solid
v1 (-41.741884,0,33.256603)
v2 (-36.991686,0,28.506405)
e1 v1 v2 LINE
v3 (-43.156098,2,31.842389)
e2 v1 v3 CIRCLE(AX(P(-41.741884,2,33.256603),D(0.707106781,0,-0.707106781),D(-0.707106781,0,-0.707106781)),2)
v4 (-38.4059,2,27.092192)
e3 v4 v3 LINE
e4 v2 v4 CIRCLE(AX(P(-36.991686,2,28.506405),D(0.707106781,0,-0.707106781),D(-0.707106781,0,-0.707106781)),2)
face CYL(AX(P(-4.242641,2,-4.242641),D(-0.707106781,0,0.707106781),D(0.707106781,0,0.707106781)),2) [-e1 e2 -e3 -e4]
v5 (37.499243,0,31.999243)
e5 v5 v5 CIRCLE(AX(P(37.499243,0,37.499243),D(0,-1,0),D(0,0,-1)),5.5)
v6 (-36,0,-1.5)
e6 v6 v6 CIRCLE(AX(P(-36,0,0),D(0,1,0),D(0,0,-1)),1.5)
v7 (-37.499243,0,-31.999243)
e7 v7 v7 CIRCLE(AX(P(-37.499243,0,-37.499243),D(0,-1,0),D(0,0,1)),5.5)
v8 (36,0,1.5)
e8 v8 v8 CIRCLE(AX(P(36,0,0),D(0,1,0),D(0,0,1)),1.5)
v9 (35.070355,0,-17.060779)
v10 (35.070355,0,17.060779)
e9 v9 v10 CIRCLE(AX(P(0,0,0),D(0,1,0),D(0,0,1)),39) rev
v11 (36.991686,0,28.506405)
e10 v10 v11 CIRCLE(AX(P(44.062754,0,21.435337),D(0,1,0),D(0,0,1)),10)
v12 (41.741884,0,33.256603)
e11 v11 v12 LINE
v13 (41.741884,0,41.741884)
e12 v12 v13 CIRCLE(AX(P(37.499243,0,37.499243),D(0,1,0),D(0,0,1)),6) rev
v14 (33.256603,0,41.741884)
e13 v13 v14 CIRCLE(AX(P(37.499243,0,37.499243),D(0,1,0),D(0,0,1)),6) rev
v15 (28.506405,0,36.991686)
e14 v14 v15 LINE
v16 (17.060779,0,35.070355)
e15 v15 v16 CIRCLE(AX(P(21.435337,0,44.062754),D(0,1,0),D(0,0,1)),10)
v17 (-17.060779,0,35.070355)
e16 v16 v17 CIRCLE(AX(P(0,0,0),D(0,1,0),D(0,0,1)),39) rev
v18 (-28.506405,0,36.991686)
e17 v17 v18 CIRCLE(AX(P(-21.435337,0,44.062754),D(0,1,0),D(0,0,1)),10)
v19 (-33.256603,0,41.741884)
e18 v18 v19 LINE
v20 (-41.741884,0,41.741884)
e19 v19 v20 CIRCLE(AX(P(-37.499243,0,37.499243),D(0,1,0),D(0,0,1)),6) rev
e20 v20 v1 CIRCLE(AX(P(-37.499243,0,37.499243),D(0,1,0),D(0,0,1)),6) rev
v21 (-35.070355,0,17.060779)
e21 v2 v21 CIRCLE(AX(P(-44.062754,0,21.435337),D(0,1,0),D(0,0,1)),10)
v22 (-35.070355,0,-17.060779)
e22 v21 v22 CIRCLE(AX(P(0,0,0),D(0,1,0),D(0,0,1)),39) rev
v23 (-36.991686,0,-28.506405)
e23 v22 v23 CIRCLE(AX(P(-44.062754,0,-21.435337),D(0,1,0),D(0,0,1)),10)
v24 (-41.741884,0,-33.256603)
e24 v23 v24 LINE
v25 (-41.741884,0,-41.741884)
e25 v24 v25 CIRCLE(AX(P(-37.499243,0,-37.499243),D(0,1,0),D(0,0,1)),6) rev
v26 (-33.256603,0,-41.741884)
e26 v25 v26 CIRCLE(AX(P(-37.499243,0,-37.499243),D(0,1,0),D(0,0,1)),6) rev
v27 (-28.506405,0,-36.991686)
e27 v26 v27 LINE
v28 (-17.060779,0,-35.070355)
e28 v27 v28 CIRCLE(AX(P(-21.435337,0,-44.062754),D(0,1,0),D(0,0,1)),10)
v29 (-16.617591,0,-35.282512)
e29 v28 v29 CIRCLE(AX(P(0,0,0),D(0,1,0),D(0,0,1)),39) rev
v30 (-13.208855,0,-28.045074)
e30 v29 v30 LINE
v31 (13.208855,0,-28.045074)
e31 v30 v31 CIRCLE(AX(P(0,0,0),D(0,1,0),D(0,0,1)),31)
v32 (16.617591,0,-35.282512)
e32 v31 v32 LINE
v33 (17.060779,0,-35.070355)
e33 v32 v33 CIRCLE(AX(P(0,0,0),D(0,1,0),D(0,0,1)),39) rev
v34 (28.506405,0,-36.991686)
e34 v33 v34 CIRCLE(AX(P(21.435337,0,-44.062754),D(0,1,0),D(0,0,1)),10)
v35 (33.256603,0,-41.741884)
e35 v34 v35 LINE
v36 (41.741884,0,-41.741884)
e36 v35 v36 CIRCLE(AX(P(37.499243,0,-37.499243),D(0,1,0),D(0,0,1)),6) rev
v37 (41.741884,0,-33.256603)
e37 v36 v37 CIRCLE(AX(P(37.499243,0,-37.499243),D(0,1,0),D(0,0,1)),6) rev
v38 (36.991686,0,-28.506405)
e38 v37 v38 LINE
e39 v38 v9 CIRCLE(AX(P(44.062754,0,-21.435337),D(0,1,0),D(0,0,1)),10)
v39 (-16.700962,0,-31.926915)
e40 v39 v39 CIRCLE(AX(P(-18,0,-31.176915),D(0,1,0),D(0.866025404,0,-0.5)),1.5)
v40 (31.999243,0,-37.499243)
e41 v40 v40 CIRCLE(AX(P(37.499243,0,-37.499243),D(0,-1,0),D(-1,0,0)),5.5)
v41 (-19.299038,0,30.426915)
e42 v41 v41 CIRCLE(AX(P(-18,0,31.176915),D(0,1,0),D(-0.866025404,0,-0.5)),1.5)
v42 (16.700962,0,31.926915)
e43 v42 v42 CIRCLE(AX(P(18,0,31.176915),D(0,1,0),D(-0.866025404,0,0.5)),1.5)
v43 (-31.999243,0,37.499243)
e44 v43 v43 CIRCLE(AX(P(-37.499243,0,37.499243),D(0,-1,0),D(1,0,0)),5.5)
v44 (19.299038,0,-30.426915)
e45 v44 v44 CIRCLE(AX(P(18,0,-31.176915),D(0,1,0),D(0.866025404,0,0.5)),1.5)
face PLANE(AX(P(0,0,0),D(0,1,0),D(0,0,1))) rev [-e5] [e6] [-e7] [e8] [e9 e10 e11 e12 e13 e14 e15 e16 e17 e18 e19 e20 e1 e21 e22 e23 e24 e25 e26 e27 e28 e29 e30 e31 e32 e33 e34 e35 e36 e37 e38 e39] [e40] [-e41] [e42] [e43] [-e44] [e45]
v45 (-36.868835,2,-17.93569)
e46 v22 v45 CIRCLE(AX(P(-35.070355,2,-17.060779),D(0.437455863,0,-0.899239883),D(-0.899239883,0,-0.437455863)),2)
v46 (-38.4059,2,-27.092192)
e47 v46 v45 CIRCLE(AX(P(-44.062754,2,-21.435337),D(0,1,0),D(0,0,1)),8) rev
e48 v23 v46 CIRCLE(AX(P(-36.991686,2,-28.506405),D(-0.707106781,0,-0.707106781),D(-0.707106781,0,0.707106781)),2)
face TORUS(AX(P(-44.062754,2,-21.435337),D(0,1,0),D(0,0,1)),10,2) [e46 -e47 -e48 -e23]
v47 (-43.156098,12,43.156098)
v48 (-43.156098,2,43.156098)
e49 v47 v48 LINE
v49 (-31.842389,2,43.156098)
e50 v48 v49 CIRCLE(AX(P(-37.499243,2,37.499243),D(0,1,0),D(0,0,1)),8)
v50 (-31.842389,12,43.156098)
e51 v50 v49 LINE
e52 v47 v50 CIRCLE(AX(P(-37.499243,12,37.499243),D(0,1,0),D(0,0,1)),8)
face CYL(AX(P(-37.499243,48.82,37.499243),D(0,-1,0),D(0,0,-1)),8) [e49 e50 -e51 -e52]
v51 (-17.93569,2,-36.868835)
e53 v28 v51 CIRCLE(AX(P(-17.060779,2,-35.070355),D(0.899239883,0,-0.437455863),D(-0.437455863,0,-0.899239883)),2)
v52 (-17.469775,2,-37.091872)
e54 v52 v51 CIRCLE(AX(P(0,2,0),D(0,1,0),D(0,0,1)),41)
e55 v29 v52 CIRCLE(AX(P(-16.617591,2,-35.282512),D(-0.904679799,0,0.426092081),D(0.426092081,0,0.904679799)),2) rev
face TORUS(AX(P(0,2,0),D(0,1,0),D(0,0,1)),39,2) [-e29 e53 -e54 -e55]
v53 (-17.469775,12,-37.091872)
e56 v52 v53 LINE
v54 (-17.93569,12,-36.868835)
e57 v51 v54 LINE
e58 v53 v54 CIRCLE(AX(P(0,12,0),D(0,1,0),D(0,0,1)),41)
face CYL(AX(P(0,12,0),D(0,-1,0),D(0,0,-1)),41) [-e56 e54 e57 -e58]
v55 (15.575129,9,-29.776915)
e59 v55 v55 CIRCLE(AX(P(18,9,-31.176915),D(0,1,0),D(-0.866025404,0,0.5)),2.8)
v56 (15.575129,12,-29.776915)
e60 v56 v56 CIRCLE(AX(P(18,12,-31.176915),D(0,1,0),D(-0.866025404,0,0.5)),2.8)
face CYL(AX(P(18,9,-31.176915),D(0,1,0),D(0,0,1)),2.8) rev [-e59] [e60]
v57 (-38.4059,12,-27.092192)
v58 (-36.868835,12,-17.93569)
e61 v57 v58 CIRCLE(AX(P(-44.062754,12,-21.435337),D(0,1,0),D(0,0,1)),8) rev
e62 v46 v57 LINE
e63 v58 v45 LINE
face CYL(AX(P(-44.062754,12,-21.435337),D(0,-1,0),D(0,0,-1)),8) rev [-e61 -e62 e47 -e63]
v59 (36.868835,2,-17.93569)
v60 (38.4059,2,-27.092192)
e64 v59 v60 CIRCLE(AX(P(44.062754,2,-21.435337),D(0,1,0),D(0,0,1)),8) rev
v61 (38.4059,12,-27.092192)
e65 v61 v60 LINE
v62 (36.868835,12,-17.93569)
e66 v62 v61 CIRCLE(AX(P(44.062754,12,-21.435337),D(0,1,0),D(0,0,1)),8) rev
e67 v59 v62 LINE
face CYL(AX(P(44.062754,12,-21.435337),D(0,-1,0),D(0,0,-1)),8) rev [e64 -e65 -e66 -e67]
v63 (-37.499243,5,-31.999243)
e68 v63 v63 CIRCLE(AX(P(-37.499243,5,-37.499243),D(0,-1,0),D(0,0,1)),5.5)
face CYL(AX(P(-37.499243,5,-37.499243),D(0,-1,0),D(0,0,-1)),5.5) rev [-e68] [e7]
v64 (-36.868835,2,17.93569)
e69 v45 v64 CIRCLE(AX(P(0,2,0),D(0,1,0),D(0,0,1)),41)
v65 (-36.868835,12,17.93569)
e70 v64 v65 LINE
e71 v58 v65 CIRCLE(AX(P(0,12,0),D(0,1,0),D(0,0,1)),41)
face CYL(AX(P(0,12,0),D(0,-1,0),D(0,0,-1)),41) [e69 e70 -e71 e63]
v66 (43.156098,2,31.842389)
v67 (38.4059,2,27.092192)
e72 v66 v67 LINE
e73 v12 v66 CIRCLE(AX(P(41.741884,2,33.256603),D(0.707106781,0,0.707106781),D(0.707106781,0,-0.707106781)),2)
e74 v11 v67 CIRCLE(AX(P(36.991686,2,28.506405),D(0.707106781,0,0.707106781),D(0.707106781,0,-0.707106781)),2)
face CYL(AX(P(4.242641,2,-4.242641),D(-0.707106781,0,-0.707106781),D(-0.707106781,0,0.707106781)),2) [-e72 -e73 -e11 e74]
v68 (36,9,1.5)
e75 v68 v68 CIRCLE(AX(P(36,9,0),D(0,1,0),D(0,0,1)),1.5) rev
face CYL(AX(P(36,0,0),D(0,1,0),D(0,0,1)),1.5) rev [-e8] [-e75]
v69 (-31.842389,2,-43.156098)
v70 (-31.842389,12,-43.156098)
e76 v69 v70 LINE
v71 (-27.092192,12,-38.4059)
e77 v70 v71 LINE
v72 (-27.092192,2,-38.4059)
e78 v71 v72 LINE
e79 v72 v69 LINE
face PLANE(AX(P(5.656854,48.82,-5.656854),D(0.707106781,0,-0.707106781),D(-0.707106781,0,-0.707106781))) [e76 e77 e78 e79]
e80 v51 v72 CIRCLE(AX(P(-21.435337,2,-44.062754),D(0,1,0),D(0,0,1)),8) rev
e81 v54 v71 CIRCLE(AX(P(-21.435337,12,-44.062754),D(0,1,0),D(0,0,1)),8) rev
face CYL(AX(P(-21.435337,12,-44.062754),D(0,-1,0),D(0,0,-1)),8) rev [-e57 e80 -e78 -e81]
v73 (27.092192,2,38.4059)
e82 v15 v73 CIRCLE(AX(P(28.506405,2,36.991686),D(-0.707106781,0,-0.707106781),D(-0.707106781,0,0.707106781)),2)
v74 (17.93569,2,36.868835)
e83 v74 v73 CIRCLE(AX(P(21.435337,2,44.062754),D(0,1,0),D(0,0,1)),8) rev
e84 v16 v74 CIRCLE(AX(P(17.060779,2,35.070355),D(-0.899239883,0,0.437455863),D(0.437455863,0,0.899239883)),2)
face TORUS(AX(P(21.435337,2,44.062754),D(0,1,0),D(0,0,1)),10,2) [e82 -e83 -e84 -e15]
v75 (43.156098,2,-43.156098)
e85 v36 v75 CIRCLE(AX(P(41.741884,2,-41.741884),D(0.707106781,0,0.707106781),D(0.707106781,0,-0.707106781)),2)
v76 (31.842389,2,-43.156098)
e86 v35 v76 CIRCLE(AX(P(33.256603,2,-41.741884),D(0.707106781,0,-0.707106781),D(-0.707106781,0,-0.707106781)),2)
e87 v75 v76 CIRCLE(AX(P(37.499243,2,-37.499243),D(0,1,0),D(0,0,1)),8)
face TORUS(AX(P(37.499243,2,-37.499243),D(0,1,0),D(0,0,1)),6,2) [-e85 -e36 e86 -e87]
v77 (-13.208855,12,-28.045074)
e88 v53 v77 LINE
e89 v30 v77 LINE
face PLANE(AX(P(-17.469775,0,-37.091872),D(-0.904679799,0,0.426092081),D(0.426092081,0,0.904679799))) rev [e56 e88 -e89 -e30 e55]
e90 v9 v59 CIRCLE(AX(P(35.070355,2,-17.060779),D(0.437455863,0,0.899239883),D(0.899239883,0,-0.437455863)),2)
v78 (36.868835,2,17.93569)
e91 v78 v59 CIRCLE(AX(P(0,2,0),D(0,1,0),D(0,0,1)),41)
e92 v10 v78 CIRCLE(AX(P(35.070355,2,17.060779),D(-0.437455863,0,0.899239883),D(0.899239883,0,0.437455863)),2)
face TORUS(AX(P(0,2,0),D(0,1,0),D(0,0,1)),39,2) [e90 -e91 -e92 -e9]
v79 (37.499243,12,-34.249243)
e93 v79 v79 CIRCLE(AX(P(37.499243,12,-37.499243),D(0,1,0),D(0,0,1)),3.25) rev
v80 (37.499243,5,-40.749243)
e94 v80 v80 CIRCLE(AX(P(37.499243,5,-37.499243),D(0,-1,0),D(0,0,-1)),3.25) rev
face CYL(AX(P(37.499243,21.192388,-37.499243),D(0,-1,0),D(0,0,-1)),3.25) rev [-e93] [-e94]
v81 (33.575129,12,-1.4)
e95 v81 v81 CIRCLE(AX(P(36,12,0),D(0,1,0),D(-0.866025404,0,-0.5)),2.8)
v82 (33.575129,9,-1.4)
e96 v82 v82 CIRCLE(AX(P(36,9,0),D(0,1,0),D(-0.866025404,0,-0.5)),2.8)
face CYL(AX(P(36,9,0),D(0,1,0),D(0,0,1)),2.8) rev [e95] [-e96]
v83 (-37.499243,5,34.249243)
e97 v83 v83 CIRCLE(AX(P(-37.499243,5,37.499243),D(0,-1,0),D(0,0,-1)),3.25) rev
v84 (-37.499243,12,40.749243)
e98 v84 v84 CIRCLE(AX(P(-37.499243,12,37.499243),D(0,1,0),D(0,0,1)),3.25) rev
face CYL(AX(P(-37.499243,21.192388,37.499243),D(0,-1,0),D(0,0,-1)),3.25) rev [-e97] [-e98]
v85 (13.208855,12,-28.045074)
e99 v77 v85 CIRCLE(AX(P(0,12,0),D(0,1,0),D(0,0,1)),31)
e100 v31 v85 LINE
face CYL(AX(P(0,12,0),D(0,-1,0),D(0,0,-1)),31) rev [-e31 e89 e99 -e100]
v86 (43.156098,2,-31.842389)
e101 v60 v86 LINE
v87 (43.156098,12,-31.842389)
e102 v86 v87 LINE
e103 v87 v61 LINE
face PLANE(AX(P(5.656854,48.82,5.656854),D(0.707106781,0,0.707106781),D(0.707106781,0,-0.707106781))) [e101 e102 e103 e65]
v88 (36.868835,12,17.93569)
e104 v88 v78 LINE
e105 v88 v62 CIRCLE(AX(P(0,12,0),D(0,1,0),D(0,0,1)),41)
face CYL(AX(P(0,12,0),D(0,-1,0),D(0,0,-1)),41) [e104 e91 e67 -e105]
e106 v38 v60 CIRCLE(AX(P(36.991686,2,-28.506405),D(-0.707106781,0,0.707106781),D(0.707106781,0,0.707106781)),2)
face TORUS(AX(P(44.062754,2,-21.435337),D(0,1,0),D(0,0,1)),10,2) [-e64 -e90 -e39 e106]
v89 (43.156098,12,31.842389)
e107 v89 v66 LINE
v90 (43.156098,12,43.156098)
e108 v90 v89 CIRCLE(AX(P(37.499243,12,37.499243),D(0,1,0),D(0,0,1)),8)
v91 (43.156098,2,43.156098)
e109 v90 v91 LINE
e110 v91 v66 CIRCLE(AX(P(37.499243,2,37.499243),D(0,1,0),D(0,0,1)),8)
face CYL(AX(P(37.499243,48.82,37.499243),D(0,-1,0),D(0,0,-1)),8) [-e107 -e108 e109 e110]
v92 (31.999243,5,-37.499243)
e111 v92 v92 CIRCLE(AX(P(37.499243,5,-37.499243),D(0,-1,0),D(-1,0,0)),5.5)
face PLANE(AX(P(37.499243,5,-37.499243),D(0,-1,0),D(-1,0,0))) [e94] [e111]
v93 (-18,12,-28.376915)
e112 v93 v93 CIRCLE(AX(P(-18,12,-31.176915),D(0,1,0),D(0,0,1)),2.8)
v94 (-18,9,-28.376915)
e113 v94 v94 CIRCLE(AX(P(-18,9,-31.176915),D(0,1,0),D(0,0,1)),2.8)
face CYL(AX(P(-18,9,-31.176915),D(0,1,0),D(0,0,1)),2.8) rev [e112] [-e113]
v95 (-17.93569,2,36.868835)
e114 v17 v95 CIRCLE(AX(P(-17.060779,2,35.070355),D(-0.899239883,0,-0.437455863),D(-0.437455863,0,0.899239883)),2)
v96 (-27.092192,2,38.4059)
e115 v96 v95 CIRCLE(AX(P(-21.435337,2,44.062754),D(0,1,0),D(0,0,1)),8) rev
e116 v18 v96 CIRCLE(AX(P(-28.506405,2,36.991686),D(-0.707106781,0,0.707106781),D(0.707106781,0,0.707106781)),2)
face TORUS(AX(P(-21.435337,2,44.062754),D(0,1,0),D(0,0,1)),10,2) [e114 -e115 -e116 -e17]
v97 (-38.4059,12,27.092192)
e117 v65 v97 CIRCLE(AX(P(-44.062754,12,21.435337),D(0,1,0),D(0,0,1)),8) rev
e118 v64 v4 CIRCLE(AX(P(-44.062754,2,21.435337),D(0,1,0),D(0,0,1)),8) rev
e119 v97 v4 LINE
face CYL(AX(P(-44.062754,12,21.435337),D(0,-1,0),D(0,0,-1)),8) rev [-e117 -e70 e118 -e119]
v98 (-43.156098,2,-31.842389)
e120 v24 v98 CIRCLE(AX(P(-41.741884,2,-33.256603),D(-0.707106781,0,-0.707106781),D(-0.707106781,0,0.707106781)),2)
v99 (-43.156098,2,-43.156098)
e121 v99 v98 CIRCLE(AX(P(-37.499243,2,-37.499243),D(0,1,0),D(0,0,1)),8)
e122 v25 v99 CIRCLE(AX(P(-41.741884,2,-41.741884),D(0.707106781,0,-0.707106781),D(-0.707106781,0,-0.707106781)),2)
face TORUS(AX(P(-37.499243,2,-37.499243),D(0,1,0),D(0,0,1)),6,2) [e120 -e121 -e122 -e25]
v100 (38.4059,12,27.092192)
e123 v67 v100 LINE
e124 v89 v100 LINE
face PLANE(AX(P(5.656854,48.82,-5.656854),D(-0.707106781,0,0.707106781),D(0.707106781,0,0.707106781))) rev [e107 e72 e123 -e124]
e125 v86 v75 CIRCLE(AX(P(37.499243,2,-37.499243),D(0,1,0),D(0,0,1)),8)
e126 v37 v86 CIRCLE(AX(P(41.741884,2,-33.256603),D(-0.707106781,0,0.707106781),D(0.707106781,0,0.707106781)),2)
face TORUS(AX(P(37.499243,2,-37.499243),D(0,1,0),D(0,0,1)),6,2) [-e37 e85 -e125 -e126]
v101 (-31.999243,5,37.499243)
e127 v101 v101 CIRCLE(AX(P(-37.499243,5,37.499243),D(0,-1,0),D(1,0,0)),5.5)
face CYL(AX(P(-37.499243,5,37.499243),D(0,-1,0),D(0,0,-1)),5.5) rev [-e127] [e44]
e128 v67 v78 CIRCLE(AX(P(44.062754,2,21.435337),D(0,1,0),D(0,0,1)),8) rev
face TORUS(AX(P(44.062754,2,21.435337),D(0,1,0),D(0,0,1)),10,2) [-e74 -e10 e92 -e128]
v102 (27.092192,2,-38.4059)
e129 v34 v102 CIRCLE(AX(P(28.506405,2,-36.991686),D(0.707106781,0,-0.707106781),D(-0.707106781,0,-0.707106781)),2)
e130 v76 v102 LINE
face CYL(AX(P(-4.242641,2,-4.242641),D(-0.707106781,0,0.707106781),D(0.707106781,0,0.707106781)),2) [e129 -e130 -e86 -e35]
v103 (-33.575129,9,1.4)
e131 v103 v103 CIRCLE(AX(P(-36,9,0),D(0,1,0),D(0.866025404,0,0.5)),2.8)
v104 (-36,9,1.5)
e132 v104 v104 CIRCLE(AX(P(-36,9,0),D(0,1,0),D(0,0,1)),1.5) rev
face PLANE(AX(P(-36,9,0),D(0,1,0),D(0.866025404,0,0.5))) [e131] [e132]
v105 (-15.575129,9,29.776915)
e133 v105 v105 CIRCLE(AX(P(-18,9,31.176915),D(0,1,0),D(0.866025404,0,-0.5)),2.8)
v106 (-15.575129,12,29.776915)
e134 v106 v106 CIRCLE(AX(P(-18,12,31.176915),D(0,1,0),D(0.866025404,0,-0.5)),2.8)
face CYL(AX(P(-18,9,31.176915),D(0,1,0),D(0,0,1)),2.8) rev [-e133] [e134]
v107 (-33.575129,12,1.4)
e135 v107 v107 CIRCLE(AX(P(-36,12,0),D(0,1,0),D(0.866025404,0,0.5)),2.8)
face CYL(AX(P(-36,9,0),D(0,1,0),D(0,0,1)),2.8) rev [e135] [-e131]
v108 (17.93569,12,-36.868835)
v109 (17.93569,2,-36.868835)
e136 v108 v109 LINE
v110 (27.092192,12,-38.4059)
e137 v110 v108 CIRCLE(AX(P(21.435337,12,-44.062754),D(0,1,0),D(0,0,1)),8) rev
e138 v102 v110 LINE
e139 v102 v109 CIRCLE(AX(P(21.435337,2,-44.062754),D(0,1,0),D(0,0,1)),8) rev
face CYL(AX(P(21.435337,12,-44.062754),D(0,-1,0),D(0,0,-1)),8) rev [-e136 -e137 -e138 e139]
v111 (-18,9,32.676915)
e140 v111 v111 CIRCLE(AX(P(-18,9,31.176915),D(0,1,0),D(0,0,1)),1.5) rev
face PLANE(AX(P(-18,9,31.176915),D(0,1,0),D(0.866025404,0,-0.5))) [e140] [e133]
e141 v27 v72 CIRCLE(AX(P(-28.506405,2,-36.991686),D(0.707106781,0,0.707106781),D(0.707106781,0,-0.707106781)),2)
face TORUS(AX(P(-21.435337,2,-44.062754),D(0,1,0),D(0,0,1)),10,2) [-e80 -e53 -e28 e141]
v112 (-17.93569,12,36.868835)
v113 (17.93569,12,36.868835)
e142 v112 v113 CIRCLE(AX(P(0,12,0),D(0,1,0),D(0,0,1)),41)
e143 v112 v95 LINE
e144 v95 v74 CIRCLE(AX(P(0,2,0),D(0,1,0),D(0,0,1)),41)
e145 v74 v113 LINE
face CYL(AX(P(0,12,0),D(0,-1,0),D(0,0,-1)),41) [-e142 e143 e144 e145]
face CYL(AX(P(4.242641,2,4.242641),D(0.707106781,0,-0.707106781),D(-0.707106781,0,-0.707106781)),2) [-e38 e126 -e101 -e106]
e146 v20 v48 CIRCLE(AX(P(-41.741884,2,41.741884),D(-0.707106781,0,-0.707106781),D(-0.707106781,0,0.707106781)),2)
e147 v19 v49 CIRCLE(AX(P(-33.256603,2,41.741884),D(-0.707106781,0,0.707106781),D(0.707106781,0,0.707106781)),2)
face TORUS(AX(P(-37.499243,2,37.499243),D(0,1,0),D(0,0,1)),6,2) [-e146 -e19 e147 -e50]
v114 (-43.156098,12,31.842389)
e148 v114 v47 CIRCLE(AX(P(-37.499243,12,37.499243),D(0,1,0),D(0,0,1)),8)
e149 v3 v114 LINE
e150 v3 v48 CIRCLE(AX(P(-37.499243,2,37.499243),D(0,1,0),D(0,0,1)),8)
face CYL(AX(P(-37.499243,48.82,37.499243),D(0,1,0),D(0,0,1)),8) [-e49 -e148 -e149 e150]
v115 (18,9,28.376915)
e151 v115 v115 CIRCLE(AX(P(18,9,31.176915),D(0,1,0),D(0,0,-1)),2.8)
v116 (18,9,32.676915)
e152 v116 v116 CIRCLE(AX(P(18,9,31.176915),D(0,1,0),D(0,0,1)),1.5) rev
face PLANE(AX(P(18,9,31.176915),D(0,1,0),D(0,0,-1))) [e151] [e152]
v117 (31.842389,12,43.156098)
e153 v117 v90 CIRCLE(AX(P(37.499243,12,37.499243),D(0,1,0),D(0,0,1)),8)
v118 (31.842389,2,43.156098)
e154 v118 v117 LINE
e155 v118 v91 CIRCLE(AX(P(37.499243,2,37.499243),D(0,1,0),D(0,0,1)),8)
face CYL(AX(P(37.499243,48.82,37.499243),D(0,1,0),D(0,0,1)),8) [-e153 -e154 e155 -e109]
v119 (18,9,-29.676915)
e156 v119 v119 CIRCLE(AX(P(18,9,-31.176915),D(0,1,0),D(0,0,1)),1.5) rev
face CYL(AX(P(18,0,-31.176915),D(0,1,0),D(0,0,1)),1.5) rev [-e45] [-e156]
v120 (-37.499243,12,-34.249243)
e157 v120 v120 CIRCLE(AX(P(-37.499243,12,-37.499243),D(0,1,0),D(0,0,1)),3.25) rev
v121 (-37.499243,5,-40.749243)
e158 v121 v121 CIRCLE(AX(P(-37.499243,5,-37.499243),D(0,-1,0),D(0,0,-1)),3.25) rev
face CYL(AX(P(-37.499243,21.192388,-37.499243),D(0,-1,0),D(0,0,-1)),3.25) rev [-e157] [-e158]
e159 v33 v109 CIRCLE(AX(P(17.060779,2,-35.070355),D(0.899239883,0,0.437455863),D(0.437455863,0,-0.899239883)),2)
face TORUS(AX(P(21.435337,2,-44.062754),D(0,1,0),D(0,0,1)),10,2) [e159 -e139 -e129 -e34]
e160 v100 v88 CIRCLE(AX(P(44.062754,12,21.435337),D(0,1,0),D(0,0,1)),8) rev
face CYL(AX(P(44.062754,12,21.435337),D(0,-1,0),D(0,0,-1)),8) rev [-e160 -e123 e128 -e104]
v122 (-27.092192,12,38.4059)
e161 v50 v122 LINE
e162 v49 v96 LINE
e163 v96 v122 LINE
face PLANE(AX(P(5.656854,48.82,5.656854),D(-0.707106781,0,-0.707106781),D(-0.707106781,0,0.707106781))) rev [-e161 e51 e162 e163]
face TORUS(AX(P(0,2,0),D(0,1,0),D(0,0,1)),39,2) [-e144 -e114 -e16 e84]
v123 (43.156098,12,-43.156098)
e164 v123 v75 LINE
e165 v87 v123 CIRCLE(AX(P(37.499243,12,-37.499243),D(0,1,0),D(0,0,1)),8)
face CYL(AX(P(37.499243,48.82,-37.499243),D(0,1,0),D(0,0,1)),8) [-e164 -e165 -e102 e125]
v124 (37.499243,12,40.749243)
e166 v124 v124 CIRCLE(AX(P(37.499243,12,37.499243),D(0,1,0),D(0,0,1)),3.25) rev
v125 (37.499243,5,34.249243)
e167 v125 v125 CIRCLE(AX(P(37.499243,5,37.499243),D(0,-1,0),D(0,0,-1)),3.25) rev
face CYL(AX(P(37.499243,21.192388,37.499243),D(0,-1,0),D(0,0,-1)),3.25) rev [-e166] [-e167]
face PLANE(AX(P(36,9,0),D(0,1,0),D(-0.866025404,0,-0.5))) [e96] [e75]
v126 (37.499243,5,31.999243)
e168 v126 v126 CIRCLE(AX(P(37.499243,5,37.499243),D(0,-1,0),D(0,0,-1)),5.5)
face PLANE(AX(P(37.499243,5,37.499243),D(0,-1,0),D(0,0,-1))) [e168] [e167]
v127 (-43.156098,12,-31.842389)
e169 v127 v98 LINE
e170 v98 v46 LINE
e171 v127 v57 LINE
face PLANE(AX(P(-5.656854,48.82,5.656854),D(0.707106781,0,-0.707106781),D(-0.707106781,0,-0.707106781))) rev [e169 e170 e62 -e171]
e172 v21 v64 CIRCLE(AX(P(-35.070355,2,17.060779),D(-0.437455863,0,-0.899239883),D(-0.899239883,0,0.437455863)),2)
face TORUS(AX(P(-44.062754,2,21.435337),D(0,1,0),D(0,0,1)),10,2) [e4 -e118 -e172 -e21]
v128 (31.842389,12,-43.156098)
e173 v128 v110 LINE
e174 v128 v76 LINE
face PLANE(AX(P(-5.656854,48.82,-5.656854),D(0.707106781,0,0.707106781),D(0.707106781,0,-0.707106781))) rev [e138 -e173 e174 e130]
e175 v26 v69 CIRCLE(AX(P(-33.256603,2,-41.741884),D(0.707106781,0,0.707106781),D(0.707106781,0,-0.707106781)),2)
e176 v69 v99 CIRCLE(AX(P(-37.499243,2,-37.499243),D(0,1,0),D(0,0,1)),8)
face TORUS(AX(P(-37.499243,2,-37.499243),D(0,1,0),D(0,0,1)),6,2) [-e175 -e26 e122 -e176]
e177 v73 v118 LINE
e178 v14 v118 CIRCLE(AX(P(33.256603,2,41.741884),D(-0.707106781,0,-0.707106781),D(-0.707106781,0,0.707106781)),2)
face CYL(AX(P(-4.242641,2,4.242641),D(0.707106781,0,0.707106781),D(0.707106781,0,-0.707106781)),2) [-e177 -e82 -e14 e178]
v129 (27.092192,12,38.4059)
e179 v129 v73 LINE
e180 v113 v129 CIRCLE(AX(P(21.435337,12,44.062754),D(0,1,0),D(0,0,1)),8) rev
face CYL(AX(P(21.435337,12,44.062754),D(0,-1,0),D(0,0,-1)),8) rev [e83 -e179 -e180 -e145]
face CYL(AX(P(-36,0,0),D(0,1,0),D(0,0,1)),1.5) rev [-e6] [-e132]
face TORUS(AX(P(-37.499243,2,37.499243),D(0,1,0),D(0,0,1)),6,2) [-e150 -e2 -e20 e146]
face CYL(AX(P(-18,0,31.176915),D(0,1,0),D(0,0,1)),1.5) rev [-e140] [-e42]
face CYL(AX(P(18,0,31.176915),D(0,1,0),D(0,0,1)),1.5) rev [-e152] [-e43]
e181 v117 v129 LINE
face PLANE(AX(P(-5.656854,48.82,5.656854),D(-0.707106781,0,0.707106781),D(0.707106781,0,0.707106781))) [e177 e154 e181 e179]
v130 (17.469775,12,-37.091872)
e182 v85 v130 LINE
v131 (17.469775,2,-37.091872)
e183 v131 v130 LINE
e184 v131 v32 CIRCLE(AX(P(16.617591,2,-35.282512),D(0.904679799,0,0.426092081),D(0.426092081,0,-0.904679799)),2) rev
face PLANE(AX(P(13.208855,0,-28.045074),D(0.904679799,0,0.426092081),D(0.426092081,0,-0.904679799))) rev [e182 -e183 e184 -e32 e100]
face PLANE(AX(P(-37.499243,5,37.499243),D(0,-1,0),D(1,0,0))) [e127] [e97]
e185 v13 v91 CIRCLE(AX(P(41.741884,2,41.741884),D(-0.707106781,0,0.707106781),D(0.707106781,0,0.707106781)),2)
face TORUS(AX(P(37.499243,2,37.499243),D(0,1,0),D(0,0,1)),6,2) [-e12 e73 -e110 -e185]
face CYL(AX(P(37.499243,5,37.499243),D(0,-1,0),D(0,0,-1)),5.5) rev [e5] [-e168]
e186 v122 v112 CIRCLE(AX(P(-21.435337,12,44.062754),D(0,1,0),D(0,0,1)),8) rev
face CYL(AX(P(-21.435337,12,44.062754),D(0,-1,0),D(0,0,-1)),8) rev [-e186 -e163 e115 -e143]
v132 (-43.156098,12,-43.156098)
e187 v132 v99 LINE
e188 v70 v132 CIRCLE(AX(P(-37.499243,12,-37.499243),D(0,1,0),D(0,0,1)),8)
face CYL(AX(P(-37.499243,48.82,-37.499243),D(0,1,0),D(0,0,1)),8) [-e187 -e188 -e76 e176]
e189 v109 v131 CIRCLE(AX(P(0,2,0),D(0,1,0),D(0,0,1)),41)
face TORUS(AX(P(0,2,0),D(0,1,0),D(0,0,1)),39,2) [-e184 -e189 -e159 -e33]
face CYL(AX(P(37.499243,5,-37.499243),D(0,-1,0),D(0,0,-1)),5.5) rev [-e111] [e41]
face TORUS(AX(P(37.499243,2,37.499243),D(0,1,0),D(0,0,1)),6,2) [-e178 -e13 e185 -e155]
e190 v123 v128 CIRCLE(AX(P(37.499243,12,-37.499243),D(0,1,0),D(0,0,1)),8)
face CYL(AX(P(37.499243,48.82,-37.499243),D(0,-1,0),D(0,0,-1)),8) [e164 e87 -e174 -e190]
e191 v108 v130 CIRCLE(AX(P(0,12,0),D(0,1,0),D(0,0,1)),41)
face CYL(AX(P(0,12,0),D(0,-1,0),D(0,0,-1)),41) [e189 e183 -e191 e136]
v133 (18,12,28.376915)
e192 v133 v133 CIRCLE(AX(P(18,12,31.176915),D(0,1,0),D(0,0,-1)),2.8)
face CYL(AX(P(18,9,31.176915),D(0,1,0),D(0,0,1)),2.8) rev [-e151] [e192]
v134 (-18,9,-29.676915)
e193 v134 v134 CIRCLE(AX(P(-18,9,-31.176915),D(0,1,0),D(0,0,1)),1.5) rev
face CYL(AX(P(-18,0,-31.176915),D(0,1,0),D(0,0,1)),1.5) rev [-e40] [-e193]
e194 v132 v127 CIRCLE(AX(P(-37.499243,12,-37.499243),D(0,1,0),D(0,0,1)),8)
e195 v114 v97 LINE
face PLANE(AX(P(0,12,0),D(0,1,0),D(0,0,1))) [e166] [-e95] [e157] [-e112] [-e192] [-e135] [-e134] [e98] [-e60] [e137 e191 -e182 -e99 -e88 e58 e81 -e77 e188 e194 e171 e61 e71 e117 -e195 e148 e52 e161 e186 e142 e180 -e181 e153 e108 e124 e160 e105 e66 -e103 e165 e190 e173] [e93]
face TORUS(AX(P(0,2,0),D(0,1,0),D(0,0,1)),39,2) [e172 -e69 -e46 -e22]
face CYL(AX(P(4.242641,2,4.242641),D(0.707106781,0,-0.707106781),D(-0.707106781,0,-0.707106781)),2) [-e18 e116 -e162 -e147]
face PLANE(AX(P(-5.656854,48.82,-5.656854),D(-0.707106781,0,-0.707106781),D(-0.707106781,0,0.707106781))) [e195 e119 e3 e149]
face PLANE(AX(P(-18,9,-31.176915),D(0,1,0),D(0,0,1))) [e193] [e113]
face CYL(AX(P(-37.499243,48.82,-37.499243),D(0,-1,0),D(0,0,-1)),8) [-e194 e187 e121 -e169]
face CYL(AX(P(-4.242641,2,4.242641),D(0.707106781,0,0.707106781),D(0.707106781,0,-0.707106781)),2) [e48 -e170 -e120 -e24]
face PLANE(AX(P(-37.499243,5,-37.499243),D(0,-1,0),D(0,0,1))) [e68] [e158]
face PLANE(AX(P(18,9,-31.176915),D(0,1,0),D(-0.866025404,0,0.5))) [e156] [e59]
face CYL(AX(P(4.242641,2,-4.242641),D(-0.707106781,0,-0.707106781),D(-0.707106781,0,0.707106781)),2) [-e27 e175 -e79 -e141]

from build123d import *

# Parameters (mm, degrees)
SKETCH1_R                = 41
SKETCH1_R_2              = 31
BOSS_EXTRUDE1_DEPTH      = 12
SKETCH2_R                = 1.5
CUT_EXTRUDE1_DEPTH       = 60.211485372
CIRPATTERN1_COUNT        = 6
CUT_EXTRUDE2_DEPTH       = 60.211485372
SKETCH4_R                = 2.8
CUT_EXTRUDE3_DEPTH       = 3
CIRPATTERN2_COUNT        = 6
BOSS_EXTRUDE2_DEPTH      = 12
FILLET1_R                = 8
FILLET2_R                = 8
SKETCH6_R                = 3.25
CUT_EXTRUDE4_DEPTH       = 12
SKETCH7_R                = 5.5
CUT_EXTRUDE5_DEPTH       = 5
CIRPATTERN3_COUNT        = 4
FILLET1_OF_CIRPATTERN3_R = 8
FILLET2_OF_CIRPATTERN3_R = 8
FILLET3_R                = 2


with BuildPart() as part:
    # Sketch1 → Boss-Extrude1 (new body)
    with BuildSketch(Plane(origin=(0, 0, 0), x_dir=(1, 0, 0), z_dir=(0, 1, 0))):
        with Locations(Location((0, 0, 0), (0, 0, 270))):
            Circle(SKETCH1_R)
        with Locations(Location((0, 0, 0), (0, 0, 270))):
            Circle(SKETCH1_R_2, mode=Mode.SUBTRACT)
    extrude(amount=BOSS_EXTRUDE1_DEPTH)

    # Sketch2 → Cut-Extrude1 (cut, through all)
    with BuildSketch(Plane(origin=(0, 12, 0), x_dir=(1, 0, 0), z_dir=(0, 1, 0))):
        with Locations(Location((36, 0, 0), (0, 0, 270))):
            Circle(SKETCH2_R)
    cut_extrude1 = extrude(amount=-CUT_EXTRUDE1_DEPTH, mode=Mode.SUBTRACT)

    # CirPattern1: Cut-Extrude1 ×6 about axis
    cirpattern1_axis = Axis((0, 0, 0), (0, 1, 0))
    for i in range(1, CIRPATTERN1_COUNT):
        add(cut_extrude1.rotate(cirpattern1_axis, i * 360 / CIRPATTERN1_COUNT), mode=Mode.SUBTRACT)

    # Sketch3 → Cut-Extrude2 (cut, through all)
    with BuildSketch(Plane(origin=(0, 12, 0), x_dir=(1, 0, 0), z_dir=(0, 1, 0))):
        with BuildLine():
            Line((-17.469775307, 37.091871761), (-13.2088545, 28.045073771))
            ThreePointArc((-13.2088545, 28.045073771), (0, 31), (13.2088545, 28.045073771))
            Line((13.2088545, 28.045073771), (17.469775307, 37.091871761))
            ThreePointArc((17.469775307, 37.091871761), (0, 41), (-17.469775307, 37.091871761))
        make_face()
    extrude(amount=-CUT_EXTRUDE2_DEPTH, mode=Mode.SUBTRACT)

    # Sketch4 → Cut-Extrude3 (cut)
    with BuildSketch(Plane(origin=(0, 12, 0), x_dir=(1, 0, 0), z_dir=(0, 1, 0))):
        with Locations(Location((-18, 31.176914536, 0), (0, 0, 270))):
            Circle(SKETCH4_R)
    cut_extrude3 = extrude(amount=-CUT_EXTRUDE3_DEPTH, mode=Mode.SUBTRACT)

    # CirPattern2: Cut-Extrude3 ×6 about axis
    cirpattern2_axis = Axis((0, 0, 0), (0, 1, 0))
    for i in range(1, CIRPATTERN2_COUNT):
        add(cut_extrude3.rotate(cirpattern2_axis, i * 360 / CIRPATTERN2_COUNT), mode=Mode.SUBTRACT)

    # Sketch5 → Boss-Extrude2 (add)
    with BuildSketch(Plane.XZ):
        with BuildLine():
            Line((48.81295185, 37.499243351), (43.156097601, 43.156097601))
            Line((43.156097601, 43.156097601), (37.499243351, 48.81295185))
            Line((37.499243351, 48.81295185), (22.777280167, 34.090988666))
            ThreePointArc((22.777280167, 34.090988666), (28.991378029, 28.991378029), (34.090988666, 22.777280167))
            Line((34.090988666, 22.777280167), (48.81295185, 37.499243351))
        make_face()
    boss_extrude2 = extrude(amount=-BOSS_EXTRUDE2_DEPTH)

    # Fillet1
    fillet1_edges = [part.edges().sort_by_distance(p)[0] for p in [
        (48.81295185, 6, 37.499243351),
        (37.499243351, 6, 48.81295185),
    ]]
    fillet(fillet1_edges, radius=FILLET1_R - 0.0001)  # a hair under: the kernel refuses the full size

    # Fillet2
    fillet2_edges = [part.edges().sort_by_distance(p)[0] for p in [
        (34.090988666, 6, 22.777280167),
        (22.777280167, 6, 34.090988666),
    ]]
    fillet(fillet2_edges, radius=FILLET2_R)

    # Sketch6 → Cut-Extrude4 (cut)
    with BuildSketch(Plane.XZ):
        with Locations(Location((37.499243351, 37.499243351, 0), (0, 0, 270))):
            Circle(SKETCH6_R)
    cut_extrude4 = extrude(amount=-CUT_EXTRUDE4_DEPTH, mode=Mode.SUBTRACT)

    # Sketch7 → Cut-Extrude5 (cut)
    with BuildSketch(Plane.XZ):
        with Locations(Location((37.499243351, 37.499243351, 0), (0, 0, 270))):
            Circle(SKETCH7_R)
    cut_extrude5 = extrude(amount=-CUT_EXTRUDE5_DEPTH, mode=Mode.SUBTRACT)

    # CirPattern3: Boss-Extrude2, Cut-Extrude4, Cut-Extrude5 ×4 about axis
    cirpattern3_axis = Axis((0, 0, 0), (0, 1, 0))
    add([boss_extrude2.rotate(cirpattern3_axis, i * 360 / CIRPATTERN3_COUNT) for i in range(1, CIRPATTERN3_COUNT)])
    add([cut_extrude4.rotate(cirpattern3_axis, i * 360 / CIRPATTERN3_COUNT) for i in range(1, CIRPATTERN3_COUNT)], mode=Mode.SUBTRACT)
    add([cut_extrude5.rotate(cirpattern3_axis, i * 360 / CIRPATTERN3_COUNT) for i in range(1, CIRPATTERN3_COUNT)], mode=Mode.SUBTRACT)

    # Fillet1 of CirPattern3
    fillet1_of_cirpattern3_edges = [part.edges().sort_by_distance(p)[0] for p in [
        (37.499243351, 6, -48.81295185),
        (48.81295185, 6, -37.499243351),
        (-48.81295185, 6, -37.499243351),
        (-37.499243351, 6, -48.81295185),
        (-37.499243351, 6, 48.81295185),
        (-48.81295185, 6, 37.499243351),
    ]]
    fillet(fillet1_of_cirpattern3_edges, radius=FILLET1_OF_CIRPATTERN3_R - 0.0001)  # a hair under: the kernel refuses the full size

    # Fillet2 of CirPattern3
    fillet2_of_cirpattern3_edges = [part.edges().sort_by_distance(p)[0] for p in [
        (22.777280167, 6, -34.090988666),
        (34.090988666, 6, -22.777280167),
        (-34.090988666, 6, -22.777280167),
        (-22.777280167, 6, -34.090988666),
        (-22.777280167, 6, 34.090988666),
        (-34.090988666, 6, 22.777280167),
    ]]
    fillet(fillet2_of_cirpattern3_edges, radius=FILLET2_OF_CIRPATTERN3_R)

    # Fillet3
    fillet3_edges = [part.edges().sort_by_distance(p)[0] for p in [
        (40.781034174, 0, 29.467325675),
        (29.467325675, 0, 40.781034174),
        (37.499243351, 0, 45.499284772),
        (45.499284772, 0, 37.499243351),
        (41, 0, 0),
        (36.173142632, 0, 22.75973449),
        (22.75973449, 0, 36.173142632),
        (29.467325675, 0, -40.781034174),
        (40.781034174, 0, -29.467325675),
        (45.499284772, 0, -37.499243351),
        (37.499243351, 0, -45.499284772),
        (-40.781034174, 0, -29.467325675),
        (-29.467325675, 0, -40.781034174),
        (-37.499243351, 0, -45.499284772),
        (-45.499284772, 0, -37.499243351),
        (-29.467325675, 0, 40.781034174),
        (-40.781034174, 0, 29.467325675),
        (-45.499284772, 0, 37.499243351),
        (-37.499243351, 0, 45.499284772),
        (17.703084096, 0, -36.98108724),
        (22.75973449, 0, -36.173142632),
        (36.173142632, 0, -22.75973449),
        (-41, 0, 0),
        (-36.173142632, 0, -22.75973449),
        (-22.75973449, 0, -36.173142632),
        (0, 0, 41),
        (-22.75973449, 0, 36.173142632),
        (-36.173142632, 0, 22.75973449),
        (-17.703084096, 0, -36.98108724),
    ]]
    fillet(fillet3_edges, radius=FILLET3_R)


solid = part.part
